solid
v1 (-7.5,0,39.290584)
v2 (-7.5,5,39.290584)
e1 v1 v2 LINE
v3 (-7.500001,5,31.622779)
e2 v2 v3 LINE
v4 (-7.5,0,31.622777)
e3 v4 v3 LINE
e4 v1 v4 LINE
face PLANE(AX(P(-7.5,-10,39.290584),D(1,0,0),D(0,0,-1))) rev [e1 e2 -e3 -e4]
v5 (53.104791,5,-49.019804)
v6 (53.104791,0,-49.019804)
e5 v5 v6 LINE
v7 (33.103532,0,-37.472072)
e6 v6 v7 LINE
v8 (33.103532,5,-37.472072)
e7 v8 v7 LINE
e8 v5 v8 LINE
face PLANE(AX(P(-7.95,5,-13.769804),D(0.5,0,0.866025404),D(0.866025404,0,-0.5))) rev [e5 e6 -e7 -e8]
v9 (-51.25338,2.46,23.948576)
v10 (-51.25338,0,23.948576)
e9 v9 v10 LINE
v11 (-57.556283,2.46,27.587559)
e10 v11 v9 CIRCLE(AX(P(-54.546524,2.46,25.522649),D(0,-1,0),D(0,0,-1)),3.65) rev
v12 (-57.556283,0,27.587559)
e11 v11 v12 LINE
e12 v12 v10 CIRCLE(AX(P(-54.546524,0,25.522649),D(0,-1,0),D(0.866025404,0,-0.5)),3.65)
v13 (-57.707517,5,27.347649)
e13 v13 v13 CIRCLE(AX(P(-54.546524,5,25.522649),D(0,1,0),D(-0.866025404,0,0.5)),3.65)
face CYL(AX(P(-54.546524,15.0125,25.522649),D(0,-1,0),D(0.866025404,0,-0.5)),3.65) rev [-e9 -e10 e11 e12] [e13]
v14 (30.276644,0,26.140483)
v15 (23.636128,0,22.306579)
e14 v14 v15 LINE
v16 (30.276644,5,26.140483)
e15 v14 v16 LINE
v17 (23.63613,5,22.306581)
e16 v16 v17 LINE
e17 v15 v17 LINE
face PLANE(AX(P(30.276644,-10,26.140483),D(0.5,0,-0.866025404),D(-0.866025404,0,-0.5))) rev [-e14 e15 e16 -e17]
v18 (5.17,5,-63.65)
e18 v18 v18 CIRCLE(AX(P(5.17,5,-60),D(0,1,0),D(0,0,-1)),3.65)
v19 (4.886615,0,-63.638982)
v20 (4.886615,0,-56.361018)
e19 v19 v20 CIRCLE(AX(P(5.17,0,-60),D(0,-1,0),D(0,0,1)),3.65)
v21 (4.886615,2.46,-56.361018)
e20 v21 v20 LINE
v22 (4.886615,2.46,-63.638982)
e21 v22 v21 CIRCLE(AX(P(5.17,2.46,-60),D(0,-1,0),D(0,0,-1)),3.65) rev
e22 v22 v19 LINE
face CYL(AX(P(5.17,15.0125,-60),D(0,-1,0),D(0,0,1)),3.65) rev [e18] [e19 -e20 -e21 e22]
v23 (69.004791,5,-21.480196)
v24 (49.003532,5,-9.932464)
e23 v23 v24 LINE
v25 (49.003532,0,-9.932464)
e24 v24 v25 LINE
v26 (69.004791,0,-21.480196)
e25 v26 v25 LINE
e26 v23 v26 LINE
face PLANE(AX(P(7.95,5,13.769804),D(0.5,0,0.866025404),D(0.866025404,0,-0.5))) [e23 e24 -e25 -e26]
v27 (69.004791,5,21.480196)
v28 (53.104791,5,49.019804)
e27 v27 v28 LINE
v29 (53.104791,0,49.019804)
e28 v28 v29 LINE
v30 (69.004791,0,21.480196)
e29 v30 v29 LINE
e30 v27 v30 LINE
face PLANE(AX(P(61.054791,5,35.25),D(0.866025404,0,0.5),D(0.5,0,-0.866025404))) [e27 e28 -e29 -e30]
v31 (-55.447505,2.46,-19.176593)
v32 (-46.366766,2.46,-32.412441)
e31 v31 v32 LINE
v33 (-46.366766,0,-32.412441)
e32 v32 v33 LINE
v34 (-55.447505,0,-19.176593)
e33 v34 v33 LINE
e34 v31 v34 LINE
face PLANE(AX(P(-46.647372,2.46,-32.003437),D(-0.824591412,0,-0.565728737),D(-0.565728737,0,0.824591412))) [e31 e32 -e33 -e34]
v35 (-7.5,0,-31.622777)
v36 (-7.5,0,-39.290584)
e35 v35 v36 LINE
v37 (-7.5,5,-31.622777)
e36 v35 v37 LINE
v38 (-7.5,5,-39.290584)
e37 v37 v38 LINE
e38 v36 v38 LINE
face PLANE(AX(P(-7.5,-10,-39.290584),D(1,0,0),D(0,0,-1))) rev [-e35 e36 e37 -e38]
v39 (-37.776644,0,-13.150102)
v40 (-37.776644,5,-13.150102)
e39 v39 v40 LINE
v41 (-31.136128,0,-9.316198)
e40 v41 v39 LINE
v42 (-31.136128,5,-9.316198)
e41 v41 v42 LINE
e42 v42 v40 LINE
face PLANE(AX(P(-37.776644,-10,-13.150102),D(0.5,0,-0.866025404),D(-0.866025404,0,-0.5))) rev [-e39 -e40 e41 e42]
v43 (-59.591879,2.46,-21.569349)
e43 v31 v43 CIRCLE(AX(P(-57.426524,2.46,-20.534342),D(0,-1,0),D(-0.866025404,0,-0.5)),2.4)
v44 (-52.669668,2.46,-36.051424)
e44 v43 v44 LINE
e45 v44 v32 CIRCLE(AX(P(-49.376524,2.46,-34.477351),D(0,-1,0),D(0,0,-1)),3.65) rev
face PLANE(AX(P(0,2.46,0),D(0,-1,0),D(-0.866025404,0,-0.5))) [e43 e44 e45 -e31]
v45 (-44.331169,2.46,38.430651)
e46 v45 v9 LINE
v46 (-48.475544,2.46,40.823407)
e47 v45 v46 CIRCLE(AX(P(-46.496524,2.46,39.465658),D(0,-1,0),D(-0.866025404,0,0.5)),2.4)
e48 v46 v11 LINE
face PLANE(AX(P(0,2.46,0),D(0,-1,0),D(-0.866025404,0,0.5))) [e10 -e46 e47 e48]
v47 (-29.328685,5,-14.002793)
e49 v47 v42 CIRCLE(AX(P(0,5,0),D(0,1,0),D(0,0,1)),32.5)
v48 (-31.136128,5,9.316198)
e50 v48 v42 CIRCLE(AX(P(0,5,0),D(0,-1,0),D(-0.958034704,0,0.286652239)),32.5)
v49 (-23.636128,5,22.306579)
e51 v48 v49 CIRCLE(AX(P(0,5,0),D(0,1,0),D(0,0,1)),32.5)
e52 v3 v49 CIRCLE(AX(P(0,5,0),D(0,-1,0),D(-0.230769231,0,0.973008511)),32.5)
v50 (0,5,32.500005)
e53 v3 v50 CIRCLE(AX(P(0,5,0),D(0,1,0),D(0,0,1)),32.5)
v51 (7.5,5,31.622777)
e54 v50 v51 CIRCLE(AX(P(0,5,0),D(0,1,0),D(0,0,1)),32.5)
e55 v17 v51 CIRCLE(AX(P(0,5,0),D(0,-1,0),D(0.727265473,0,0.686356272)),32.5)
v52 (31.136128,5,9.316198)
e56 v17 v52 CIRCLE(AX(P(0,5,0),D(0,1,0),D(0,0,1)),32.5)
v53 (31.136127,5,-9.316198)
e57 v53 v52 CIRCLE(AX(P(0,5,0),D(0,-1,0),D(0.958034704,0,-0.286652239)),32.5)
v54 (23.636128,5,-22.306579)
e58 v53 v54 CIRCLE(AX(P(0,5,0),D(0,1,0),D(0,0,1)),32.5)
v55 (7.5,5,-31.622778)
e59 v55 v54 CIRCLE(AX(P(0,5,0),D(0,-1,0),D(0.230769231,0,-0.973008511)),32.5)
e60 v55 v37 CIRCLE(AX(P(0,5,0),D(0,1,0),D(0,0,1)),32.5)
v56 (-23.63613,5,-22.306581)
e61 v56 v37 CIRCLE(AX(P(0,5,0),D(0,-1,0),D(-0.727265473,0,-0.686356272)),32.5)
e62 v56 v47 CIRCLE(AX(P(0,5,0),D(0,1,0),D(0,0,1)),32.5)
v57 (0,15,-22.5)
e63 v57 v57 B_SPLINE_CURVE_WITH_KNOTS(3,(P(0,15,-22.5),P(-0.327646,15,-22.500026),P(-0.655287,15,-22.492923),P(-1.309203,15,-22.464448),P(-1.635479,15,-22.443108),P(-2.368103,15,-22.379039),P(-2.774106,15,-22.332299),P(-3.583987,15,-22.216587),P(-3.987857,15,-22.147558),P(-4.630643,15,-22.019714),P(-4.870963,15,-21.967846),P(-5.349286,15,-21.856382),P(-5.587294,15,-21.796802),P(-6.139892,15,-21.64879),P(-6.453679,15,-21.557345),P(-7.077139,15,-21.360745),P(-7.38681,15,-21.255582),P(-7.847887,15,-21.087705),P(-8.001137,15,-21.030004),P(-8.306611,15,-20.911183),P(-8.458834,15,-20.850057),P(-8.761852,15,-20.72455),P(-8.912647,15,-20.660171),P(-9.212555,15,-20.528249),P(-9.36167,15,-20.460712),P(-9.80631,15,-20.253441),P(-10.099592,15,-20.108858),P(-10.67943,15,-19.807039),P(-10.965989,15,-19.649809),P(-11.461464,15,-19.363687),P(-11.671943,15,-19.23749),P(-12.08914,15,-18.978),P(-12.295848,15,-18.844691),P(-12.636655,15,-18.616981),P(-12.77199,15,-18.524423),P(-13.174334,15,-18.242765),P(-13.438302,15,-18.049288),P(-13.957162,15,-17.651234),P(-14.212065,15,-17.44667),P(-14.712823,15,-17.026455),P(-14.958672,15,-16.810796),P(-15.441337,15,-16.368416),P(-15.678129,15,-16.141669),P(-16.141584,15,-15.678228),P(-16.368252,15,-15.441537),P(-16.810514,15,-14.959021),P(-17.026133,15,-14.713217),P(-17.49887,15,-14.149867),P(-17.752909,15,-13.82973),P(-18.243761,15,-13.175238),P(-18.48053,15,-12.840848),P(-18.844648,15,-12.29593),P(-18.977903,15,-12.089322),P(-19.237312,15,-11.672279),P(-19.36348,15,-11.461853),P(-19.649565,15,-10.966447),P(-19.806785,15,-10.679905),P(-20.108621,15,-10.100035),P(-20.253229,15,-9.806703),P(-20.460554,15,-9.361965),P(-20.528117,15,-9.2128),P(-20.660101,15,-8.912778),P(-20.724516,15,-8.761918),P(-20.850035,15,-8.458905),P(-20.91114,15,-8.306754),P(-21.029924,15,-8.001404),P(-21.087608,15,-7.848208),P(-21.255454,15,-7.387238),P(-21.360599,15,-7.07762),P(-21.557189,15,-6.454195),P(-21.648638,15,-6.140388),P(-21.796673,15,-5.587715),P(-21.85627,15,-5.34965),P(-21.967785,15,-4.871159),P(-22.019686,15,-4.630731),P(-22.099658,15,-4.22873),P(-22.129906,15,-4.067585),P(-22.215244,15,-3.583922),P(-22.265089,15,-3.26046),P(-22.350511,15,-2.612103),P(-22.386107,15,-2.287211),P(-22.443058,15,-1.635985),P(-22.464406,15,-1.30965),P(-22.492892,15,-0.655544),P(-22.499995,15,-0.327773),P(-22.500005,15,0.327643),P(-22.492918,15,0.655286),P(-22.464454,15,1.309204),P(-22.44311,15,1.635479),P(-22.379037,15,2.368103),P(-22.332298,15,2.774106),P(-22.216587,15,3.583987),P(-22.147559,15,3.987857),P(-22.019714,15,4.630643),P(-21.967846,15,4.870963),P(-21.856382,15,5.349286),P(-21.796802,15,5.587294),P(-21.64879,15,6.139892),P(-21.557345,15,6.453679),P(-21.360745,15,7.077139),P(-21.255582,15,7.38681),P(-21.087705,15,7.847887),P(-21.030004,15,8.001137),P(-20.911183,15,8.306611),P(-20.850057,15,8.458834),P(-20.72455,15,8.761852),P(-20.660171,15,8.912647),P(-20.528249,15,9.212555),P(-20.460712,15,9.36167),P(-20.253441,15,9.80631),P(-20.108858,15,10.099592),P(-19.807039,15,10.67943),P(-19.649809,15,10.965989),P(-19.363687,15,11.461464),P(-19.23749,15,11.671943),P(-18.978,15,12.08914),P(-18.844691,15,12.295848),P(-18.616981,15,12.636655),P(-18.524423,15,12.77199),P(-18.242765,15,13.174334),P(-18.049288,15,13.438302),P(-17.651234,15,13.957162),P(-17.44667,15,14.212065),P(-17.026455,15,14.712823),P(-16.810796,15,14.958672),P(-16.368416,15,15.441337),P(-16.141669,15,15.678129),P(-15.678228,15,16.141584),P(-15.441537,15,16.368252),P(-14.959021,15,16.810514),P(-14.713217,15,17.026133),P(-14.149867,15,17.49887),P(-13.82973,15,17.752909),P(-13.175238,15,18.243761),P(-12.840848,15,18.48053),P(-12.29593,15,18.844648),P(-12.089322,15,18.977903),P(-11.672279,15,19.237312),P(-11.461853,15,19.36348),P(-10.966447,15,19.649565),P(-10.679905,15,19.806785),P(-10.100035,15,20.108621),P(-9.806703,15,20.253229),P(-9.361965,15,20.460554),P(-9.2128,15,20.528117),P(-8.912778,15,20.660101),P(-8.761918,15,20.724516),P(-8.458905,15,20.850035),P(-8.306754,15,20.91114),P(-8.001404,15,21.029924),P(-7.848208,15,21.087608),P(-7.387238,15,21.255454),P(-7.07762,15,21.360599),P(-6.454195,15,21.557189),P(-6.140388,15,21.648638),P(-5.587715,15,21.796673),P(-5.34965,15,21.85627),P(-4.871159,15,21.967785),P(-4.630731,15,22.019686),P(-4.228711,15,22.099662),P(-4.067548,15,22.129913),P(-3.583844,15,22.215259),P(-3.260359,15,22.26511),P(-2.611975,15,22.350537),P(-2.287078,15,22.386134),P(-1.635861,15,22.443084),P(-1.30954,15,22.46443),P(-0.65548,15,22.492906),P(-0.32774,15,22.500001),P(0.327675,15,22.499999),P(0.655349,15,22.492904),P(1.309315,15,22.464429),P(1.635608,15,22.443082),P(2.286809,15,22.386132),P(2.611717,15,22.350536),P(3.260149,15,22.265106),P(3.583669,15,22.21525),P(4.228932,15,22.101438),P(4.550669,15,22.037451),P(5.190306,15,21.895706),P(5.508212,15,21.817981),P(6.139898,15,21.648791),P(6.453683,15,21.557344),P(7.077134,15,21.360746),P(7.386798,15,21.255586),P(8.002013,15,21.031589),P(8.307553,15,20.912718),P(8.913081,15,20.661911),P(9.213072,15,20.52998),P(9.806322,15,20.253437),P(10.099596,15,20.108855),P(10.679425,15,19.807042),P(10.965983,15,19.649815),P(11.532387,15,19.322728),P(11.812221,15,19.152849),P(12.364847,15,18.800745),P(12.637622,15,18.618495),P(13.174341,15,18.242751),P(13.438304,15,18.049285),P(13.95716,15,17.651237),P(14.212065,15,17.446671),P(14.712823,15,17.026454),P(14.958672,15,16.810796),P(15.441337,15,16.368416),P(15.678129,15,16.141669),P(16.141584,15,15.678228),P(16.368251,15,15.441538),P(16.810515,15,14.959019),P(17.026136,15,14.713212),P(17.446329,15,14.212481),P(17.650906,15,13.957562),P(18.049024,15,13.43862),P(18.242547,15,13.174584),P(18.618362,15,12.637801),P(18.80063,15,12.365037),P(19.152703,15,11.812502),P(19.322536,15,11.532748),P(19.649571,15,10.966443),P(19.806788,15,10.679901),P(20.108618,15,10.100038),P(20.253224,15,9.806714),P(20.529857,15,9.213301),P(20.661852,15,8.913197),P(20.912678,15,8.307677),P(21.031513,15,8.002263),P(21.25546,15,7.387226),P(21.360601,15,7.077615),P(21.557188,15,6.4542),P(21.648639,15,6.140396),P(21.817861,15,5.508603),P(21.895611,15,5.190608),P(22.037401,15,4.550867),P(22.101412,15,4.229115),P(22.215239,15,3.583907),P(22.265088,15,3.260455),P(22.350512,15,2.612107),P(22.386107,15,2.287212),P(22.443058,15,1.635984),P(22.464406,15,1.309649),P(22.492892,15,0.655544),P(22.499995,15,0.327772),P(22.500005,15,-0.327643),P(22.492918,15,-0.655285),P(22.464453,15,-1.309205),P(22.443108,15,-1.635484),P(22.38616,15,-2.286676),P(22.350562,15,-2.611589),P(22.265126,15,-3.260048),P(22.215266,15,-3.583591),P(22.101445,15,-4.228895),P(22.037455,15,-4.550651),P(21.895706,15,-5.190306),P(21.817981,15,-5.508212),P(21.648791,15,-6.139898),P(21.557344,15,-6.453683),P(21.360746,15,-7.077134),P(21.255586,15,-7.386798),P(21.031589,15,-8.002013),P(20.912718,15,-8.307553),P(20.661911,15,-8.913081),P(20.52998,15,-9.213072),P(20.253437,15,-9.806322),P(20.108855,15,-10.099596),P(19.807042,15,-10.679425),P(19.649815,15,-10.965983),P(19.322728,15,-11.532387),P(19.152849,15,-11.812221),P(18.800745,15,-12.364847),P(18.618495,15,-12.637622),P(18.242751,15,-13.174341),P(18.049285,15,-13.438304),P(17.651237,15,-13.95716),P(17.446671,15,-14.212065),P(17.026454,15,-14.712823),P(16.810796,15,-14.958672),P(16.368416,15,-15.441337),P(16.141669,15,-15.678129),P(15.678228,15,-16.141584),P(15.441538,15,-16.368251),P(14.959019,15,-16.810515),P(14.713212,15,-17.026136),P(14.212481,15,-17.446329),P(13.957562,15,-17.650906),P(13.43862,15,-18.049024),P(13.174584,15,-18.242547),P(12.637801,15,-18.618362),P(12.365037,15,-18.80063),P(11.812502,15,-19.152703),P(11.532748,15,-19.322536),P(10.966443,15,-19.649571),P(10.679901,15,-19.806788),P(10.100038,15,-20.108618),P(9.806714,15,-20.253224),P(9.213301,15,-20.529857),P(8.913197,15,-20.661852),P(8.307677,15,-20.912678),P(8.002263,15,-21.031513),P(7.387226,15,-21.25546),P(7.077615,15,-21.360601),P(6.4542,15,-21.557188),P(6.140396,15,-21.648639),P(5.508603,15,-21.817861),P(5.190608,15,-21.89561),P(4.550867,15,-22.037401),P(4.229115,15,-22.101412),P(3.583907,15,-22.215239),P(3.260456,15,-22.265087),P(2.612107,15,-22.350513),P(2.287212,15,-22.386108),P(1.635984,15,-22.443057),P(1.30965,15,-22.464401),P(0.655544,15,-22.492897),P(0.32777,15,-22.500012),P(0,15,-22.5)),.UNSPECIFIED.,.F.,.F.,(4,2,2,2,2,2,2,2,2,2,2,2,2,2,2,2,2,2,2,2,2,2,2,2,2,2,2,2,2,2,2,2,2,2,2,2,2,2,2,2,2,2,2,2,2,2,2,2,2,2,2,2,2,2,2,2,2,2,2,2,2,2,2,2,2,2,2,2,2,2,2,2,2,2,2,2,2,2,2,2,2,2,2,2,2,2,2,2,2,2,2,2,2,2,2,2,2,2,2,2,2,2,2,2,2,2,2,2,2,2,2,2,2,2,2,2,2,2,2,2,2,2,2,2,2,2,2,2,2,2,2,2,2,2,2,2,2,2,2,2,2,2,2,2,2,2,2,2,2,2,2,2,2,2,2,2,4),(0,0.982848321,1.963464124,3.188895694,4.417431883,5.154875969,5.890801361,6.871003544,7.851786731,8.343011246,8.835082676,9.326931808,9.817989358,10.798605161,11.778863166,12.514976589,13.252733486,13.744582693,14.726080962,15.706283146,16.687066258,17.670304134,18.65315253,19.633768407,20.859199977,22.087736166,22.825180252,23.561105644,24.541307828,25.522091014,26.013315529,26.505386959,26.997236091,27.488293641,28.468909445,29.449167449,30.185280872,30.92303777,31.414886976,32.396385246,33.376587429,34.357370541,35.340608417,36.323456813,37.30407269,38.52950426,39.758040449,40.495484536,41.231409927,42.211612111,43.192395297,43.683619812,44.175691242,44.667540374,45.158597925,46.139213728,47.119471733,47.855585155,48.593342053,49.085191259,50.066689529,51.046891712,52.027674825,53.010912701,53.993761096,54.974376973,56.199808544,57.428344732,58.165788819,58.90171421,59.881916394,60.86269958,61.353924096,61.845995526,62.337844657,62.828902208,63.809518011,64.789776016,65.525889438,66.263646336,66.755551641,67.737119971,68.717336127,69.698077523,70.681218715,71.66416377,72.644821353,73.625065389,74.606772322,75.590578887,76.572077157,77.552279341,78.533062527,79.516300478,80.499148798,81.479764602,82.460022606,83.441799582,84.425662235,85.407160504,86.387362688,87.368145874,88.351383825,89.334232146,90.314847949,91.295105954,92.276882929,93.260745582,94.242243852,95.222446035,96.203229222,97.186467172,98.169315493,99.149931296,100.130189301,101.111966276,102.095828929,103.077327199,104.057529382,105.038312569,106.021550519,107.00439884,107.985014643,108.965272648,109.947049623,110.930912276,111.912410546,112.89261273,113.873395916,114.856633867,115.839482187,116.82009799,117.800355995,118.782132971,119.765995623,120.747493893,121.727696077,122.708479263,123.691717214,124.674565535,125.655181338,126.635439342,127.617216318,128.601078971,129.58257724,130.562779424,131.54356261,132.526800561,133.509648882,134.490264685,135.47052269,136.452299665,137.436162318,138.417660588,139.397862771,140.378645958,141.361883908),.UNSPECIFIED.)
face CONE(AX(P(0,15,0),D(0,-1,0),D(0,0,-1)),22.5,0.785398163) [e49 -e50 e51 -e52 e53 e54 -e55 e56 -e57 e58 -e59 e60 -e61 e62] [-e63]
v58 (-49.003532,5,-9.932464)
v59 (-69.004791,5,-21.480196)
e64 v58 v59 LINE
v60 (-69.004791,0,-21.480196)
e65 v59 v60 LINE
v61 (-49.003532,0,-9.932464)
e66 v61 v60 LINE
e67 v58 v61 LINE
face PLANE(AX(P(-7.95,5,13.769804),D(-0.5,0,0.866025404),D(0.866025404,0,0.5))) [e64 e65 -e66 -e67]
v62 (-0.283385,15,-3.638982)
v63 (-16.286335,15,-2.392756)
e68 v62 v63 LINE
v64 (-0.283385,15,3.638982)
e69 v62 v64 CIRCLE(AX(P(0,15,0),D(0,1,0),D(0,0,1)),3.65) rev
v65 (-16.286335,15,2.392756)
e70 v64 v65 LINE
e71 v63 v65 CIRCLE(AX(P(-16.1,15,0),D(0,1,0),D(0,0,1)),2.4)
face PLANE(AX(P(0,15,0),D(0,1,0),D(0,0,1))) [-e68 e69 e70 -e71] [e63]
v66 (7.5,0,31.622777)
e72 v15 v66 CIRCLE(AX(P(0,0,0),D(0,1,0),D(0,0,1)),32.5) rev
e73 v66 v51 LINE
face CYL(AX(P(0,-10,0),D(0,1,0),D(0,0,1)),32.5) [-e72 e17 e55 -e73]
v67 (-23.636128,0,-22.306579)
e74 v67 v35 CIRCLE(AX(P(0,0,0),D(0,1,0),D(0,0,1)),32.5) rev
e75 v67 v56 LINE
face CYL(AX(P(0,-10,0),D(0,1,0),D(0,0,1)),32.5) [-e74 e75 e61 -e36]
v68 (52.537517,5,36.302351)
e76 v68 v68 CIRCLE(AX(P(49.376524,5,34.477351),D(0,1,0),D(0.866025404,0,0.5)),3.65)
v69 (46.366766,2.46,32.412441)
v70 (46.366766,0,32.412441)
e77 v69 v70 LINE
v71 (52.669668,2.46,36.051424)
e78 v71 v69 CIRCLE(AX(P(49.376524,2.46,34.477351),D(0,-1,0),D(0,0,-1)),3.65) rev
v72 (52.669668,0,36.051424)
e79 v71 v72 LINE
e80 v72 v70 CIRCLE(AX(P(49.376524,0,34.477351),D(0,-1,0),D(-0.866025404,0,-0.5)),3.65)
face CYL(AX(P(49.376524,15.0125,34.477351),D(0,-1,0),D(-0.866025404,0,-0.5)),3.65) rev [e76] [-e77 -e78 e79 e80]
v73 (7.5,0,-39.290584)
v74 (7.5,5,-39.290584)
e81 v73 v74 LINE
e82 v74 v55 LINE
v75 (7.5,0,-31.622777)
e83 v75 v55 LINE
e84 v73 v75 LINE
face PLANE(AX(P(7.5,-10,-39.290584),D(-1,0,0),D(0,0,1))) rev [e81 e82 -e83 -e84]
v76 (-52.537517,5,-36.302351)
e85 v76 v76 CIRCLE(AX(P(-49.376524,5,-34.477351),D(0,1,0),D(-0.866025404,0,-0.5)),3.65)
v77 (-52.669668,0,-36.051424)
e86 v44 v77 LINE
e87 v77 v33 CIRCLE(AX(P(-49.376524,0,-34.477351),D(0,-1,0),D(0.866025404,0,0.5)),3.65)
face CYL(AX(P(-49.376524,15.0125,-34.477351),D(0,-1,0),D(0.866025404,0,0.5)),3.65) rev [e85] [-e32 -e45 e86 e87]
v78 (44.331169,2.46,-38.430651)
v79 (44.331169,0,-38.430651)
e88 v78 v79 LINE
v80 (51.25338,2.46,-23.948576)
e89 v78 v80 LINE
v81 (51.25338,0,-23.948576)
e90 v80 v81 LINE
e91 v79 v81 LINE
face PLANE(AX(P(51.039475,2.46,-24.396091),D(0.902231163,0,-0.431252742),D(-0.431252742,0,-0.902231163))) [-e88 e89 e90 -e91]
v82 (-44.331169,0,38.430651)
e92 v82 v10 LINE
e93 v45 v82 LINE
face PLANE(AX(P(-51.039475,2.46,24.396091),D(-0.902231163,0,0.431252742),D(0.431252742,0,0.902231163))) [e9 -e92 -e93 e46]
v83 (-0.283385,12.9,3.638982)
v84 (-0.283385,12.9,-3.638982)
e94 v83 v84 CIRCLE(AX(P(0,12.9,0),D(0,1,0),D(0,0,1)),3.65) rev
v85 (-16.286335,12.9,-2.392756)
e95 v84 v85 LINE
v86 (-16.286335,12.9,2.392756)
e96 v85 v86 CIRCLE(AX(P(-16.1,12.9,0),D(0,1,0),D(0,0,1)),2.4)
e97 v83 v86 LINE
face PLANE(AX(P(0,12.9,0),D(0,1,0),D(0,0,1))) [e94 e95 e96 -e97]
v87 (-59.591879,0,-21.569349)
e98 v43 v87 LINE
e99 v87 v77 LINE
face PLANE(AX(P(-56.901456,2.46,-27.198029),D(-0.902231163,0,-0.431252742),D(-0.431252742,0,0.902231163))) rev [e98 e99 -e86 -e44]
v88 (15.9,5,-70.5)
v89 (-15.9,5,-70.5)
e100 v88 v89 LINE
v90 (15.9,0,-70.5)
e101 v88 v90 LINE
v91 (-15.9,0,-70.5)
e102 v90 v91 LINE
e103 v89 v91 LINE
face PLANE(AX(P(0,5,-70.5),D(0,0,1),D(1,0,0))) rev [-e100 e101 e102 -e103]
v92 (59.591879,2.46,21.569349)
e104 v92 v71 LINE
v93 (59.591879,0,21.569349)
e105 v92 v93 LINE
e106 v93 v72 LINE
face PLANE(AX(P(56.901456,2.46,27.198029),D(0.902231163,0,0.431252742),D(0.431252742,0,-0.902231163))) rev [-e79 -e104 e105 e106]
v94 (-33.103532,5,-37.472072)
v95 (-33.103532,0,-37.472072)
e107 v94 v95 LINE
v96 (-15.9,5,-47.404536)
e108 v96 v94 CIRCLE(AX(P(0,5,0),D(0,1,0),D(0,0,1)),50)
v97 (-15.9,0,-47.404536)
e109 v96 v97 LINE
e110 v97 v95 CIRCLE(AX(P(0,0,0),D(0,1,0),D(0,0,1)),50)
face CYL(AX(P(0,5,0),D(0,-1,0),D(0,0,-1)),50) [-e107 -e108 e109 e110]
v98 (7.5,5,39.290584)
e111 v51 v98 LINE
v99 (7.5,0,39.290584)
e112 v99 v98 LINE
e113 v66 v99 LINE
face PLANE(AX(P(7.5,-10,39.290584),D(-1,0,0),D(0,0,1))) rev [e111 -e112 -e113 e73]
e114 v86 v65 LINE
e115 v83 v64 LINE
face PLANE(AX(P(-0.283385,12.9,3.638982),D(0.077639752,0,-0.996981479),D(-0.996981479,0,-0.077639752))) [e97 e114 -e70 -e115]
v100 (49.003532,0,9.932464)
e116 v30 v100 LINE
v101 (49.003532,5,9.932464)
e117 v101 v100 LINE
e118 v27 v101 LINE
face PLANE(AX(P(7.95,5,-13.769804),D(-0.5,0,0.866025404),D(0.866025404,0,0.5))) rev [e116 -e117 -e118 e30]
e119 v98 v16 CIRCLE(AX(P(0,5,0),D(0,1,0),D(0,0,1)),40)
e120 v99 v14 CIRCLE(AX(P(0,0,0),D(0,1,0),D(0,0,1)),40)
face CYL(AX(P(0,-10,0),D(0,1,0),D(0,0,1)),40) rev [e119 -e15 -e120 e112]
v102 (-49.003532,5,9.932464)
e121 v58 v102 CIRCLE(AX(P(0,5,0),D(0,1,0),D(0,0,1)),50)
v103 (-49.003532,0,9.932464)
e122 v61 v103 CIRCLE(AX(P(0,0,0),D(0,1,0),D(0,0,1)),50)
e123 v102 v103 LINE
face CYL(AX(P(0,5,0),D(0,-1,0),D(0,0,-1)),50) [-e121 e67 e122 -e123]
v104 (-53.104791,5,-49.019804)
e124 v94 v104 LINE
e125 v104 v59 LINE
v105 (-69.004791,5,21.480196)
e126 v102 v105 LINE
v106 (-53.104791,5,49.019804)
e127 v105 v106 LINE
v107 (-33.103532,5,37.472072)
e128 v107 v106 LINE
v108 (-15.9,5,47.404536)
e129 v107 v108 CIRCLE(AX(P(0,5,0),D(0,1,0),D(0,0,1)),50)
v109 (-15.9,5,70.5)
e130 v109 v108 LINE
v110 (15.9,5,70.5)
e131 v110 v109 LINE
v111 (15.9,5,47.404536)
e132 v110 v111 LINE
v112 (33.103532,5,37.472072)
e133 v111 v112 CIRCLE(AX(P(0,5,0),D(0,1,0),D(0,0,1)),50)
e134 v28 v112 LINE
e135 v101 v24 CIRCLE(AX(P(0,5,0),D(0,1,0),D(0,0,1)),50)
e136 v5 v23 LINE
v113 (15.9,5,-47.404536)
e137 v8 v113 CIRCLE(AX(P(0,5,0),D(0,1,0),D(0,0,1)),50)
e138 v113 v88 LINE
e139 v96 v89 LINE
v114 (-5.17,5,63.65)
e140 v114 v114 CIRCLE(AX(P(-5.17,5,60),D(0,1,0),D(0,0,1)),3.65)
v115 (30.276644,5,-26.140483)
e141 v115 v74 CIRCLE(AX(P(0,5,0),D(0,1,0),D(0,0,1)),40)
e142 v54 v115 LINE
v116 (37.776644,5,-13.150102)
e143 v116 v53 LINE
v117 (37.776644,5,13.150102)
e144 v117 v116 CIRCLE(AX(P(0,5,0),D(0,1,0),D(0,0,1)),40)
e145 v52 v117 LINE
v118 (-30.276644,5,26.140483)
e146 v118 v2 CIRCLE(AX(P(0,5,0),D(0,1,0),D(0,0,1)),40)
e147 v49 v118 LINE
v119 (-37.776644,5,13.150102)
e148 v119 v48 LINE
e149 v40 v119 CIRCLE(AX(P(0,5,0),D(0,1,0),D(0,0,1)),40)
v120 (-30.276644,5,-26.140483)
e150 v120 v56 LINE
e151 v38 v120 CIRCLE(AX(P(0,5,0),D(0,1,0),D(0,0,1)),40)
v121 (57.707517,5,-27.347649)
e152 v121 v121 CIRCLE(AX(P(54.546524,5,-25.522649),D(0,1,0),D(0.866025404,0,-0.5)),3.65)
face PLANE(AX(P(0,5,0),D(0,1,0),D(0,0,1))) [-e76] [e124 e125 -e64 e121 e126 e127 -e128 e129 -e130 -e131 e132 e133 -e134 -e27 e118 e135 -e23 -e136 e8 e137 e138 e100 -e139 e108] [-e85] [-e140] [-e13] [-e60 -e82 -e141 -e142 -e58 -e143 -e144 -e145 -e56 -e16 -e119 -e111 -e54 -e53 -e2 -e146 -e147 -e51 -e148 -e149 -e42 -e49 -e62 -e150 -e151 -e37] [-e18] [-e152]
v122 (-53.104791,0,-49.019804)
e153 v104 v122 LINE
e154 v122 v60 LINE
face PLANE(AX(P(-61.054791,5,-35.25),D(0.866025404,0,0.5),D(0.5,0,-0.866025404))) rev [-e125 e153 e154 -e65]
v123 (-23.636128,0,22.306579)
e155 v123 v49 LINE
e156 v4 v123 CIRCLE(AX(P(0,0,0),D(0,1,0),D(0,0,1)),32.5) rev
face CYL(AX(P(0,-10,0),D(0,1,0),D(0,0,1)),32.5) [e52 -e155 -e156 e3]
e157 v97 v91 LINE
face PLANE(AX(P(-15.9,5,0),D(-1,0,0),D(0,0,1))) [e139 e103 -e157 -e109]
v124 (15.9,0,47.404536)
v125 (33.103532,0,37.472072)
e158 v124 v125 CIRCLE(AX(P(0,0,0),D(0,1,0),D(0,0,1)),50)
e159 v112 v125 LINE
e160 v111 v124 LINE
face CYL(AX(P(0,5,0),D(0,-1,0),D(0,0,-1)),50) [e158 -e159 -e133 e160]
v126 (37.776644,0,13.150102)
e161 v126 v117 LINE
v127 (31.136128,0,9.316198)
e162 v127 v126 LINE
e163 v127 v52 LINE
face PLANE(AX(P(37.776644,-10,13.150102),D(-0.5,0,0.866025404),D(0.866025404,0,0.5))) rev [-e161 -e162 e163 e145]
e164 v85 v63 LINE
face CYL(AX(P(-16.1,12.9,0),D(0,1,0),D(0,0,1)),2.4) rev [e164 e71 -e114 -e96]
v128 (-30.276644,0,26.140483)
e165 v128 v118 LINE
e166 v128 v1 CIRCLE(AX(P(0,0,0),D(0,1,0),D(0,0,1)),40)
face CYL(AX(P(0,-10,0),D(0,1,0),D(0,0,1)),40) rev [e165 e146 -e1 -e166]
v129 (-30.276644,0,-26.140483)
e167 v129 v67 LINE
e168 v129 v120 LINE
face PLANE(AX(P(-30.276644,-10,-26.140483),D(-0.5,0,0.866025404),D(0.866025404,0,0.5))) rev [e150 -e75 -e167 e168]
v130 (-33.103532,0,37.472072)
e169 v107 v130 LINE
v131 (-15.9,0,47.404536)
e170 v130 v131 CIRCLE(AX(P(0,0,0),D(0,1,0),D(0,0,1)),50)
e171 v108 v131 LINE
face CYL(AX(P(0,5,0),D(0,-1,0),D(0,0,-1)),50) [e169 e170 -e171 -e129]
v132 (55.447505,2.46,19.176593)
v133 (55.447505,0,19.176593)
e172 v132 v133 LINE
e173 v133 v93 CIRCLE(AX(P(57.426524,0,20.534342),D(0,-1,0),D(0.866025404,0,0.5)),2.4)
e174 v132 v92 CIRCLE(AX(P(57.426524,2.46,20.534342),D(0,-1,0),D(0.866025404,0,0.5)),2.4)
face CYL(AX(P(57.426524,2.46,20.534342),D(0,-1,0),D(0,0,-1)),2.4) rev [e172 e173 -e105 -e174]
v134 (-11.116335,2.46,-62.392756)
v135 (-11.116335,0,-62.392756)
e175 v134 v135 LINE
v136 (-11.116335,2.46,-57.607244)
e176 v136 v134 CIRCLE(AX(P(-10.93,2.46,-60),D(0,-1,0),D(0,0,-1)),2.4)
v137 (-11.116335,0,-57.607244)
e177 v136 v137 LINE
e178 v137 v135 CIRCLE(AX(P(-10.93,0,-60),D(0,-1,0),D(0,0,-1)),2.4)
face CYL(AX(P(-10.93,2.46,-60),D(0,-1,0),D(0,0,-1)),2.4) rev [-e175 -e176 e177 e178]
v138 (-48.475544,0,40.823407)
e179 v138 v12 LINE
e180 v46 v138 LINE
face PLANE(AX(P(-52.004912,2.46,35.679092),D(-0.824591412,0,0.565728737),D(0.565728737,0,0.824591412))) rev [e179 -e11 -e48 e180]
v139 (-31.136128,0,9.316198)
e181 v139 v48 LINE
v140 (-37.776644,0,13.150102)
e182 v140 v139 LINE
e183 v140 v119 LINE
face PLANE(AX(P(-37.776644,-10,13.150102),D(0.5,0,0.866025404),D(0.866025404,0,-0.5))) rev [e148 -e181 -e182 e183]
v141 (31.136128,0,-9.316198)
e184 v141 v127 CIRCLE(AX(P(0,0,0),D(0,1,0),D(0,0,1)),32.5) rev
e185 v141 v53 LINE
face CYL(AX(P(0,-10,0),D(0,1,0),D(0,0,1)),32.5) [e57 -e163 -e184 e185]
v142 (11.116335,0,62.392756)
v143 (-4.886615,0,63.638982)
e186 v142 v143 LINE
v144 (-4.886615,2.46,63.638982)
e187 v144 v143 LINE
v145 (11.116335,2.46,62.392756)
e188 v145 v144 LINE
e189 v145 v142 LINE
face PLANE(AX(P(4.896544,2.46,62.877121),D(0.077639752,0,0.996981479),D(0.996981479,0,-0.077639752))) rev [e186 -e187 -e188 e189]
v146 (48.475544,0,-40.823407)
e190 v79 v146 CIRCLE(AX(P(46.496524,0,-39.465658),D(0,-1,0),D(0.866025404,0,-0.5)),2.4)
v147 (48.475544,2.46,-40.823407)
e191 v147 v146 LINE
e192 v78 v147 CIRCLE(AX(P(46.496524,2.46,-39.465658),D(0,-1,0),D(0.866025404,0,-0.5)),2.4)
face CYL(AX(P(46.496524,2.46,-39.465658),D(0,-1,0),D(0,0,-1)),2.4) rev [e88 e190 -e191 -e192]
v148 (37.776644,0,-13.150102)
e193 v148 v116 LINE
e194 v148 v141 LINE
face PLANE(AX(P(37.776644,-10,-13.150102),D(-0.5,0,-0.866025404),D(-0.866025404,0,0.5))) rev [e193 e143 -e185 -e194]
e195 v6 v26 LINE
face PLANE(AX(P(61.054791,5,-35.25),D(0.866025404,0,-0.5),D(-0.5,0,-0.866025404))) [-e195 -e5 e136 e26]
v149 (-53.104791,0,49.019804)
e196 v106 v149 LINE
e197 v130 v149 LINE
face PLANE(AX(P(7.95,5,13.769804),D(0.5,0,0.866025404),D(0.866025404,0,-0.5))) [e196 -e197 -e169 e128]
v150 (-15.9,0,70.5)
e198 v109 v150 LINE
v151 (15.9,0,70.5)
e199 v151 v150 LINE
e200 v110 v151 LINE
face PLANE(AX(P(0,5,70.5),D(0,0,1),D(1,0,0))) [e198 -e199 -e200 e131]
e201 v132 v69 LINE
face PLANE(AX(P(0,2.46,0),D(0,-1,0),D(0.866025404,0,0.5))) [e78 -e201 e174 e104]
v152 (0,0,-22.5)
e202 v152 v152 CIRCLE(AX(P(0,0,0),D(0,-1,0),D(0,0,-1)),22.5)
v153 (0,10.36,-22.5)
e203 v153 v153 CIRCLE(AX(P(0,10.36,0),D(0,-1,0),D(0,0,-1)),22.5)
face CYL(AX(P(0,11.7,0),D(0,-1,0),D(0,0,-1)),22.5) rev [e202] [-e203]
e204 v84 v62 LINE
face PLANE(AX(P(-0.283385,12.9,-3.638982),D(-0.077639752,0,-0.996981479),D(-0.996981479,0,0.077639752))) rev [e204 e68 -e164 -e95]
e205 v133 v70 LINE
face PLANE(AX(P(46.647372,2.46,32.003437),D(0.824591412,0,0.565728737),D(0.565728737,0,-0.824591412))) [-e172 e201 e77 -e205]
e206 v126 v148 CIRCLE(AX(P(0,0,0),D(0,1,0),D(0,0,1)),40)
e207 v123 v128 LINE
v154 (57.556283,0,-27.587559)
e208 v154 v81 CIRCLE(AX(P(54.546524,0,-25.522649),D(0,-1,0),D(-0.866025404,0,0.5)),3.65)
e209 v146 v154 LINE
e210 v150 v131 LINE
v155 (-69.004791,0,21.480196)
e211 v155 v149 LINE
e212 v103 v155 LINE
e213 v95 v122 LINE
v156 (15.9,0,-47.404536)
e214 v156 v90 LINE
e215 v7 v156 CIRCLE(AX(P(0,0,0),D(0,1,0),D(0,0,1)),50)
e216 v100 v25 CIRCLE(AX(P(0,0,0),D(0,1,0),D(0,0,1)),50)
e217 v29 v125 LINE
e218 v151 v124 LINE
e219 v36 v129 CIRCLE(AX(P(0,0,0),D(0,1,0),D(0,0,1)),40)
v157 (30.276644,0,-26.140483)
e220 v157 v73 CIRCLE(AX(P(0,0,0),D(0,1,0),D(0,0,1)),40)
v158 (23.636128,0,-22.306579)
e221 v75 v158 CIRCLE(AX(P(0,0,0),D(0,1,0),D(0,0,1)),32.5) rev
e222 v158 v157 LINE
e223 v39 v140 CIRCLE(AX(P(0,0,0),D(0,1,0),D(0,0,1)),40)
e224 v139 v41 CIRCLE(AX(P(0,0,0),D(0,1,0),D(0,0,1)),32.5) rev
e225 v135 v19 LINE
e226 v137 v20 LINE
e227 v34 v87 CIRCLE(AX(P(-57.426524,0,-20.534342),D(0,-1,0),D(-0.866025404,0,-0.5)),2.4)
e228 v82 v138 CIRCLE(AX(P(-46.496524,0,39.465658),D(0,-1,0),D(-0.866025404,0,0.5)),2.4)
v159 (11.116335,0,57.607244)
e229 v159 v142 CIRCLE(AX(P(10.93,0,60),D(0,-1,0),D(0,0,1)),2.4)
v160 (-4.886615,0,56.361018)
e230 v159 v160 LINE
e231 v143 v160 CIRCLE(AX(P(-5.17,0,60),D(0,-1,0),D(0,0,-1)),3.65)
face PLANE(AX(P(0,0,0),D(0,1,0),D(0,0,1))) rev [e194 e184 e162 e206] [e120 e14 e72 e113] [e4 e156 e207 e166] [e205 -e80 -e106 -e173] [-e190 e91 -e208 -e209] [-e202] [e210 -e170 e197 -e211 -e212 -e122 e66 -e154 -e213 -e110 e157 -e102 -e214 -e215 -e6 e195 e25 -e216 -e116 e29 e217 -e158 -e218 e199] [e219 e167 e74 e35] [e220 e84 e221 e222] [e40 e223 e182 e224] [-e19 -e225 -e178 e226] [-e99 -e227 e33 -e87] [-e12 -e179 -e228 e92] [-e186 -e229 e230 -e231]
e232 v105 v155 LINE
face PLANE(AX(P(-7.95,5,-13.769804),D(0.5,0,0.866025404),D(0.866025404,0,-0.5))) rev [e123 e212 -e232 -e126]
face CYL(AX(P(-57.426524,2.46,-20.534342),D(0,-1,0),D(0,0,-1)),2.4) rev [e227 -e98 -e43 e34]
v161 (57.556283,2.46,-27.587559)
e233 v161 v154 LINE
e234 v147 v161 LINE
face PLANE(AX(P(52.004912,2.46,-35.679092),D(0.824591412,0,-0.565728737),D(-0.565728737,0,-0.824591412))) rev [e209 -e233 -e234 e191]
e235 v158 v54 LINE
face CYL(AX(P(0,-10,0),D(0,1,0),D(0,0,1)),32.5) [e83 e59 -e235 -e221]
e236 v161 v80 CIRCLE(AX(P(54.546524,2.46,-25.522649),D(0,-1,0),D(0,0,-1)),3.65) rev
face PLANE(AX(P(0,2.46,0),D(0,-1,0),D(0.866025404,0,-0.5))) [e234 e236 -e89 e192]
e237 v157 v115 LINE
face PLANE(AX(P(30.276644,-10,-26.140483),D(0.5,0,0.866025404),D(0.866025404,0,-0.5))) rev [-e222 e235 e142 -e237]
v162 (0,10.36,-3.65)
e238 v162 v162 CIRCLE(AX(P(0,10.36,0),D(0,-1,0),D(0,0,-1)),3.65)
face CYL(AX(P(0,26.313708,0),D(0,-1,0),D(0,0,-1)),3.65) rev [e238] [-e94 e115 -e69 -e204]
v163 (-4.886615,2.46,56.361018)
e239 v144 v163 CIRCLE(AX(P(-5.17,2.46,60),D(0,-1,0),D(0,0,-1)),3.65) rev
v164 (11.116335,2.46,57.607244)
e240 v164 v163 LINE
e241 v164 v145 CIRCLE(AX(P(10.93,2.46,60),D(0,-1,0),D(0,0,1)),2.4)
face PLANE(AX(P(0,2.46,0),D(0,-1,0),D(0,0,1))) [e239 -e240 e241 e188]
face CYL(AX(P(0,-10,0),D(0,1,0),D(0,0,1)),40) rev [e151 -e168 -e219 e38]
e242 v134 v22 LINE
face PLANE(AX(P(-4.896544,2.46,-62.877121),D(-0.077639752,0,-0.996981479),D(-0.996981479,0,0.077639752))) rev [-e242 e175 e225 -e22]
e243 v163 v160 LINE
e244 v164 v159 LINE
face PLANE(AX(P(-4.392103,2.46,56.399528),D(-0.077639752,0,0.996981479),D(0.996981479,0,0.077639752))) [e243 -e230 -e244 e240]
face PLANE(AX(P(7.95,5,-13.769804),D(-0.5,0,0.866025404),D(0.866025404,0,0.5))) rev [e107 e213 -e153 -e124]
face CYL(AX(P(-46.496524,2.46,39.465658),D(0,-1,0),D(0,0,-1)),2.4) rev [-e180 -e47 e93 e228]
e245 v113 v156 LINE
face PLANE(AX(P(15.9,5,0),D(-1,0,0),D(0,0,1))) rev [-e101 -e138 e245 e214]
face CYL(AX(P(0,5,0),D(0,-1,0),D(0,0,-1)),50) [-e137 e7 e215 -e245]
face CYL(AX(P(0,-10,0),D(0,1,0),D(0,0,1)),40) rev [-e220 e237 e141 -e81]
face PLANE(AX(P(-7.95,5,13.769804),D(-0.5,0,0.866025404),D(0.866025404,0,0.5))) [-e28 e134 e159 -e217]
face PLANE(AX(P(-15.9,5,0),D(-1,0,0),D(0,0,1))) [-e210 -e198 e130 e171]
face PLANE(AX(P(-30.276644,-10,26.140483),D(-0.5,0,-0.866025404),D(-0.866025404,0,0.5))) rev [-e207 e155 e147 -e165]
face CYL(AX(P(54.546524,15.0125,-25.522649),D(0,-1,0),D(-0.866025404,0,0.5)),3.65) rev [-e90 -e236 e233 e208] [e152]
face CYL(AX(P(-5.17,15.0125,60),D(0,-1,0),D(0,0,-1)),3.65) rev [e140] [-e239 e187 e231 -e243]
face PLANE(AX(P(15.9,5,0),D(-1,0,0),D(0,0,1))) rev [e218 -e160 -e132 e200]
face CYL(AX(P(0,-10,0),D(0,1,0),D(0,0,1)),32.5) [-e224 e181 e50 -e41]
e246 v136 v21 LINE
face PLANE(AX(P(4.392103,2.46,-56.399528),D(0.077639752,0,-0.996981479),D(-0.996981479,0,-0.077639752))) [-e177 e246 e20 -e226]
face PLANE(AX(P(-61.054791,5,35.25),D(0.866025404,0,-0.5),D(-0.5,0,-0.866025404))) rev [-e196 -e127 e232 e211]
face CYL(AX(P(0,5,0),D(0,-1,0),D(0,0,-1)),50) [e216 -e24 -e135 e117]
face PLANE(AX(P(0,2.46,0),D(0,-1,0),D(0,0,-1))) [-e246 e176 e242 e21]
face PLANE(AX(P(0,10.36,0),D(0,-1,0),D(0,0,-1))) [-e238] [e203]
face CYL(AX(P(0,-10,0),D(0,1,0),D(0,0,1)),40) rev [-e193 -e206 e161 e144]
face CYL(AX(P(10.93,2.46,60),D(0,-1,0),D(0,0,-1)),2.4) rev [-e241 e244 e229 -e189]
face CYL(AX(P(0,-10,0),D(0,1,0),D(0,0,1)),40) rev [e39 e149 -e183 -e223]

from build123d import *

# Parameters (mm, degrees)
BOSS_EXTRUDE1_DEPTH = 5
CIRPATTERN1_COUNT   = 3
CIRPATTERN1_ANGLE   = 120
SKETCH8_R           = 22.5
BOSS_EXTRUDE4_DEPTH = 10
SKETCH11_R          = 22.5
CUT_EXTRUDE4_DEPTH  = 11.7
SKETCH12_R          = 4
CUT_EXTRUDE5_DEPTH  = 3.3
SKETCH14_R          = 3.65
CUT_EXTRUDE7_DEPTH  = 100.784323589
CIRPATTERN2_COUNT   = 6
CUT_EXTRUDE9_DEPTH  = 15
SKETCH16_R          = 2.4
SKETCH16_R_2        = 3.65
CUT_EXTRUDE10_DEPTH = 2.46
CIRPATTERN3_COUNT   = 6
SKETCH17_R          = 4
SKETCH17_R_2        = 3.65
BOSS_EXTRUDE5_DEPTH = 3.3
CUT_EXTRUDE11_START = -2.1
SKETCH18_R          = 2.4
SKETCH18_R_2        = 3.65
CUT_EXTRUDE11_DEPTH = 2.1
BOSS_EXTRUDE6_START = 1.34
SKETCH21_R          = 22.5
BOSS_EXTRUDE6_DEPTH = 1.34
CUT_EXTRUDE12_START = -10.34
SKETCH22_R          = 3.65
CUT_EXTRUDE12_DEPTH = 10.34


# Read off the part's stored shape, not the designer's step: Boundary2
with BuildPart() as part:
    # Sketch1 → Boss-Extrude1 (new body)
    with BuildSketch(Plane(origin=(0, 0, 0), x_dir=(1, 0, 0), z_dir=(0, 1, 0))):
        with BuildLine():
            ThreePointArc((-15.9, 47.404535648), (-50, 0), (-15.9, -47.404535648))
            Line((-15.9, -47.404535648), (-15.9, 47.404535648))
        make_face()
        with BuildLine():
            ThreePointArc((-15.9, -47.404535648), (0, -50), (15.9, -47.404535648))
            Line((15.9, -47.404535648), (15.9, 47.404535648))
            ThreePointArc((15.9, 47.404535648), (0, 50), (-15.9, 47.404535648))
            Line((-15.9, 47.404535648), (-15.9, -47.404535648))
        make_face()
        with BuildLine():
            Line((-15.9, -70.5), (15.9, -70.5))
            Line((15.9, -70.5), (15.9, -47.404535648))
            ThreePointArc((15.9, -47.404535648), (0, -50), (-15.9, -47.404535648))
            Line((-15.9, -47.404535648), (-15.9, -70.5))
        make_face()
        with BuildLine():
            ThreePointArc((-15.9, 47.404535648), (0, 50), (15.9, 47.404535648))
            Line((15.9, 47.404535648), (15.9, 70.5))
            Line((15.9, 70.5), (-15.9, 70.5))
            Line((-15.9, 70.5), (-15.9, 47.404535648))
        make_face()
        with BuildLine():
            Line((15.9, 47.404535648), (15.9, -47.404535648))
            ThreePointArc((15.9, -47.404535648), (40.589407485, -29.197602641), (50, 0))
            ThreePointArc((50, 0), (40.589407485, 29.197602641), (15.9, 47.404535648))
        make_face()
    boss_extrude1 = extrude(amount=BOSS_EXTRUDE1_DEPTH)

    # CirPattern1: Boss-Extrude1 ×3 about axis
    cirpattern1_axis = Axis((0, 0, 0), (0, 1, 0))
    for i in range(1, CIRPATTERN1_COUNT):
        add(boss_extrude1.rotate(cirpattern1_axis, i * CIRPATTERN1_ANGLE / (CIRPATTERN1_COUNT - 1)))

    # Sketch8 → Boss-Extrude4 (add)
    with BuildSketch(Plane(origin=(0, 5, 0), x_dir=(1, 0, 0), z_dir=(0, 1, 0))):
        with Locations(Location((0, 0, 0), (0, 0, 270))):
            Circle(SKETCH8_R)
    extrude(amount=BOSS_EXTRUDE4_DEPTH)

    # Boundary2 outline → Boundary2 (revolve)
    with BuildSketch(Plane.XY):
        Polygon((32.5, 5), (22.499998072, 15.000001928), (22.5, 5), align=None)
    revolve(axis=Axis((0, 0, 0), (0, 1, 0)))

    # Sketch11 → Cut-Extrude4 (cut)
    with BuildSketch(Plane.XZ):
        with Locations(Location((0, 0, 0), (0, 0, 270))):
            Circle(SKETCH11_R)
    extrude(amount=-CUT_EXTRUDE4_DEPTH, mode=Mode.SUBTRACT)

    # Sketch12 → Cut-Extrude5 (cut)
    with BuildSketch(Plane.XZ.offset(-11.7)):
        with Locations(Location((0, 0, 0), (0, 0, 270))):
            Circle(SKETCH12_R)
    extrude(amount=-CUT_EXTRUDE5_DEPTH, mode=Mode.SUBTRACT)

    # Sketch14 → Cut-Extrude7 (cut, through all)
    with BuildSketch(Plane(origin=(0, 0, 0), x_dir=(-1, 0, 0), z_dir=(0, -1, 0))):
        with Locations(Location((5.17, -60, 0), (0, 0, 90))):
            Circle(SKETCH14_R)
    cut_extrude7 = extrude(amount=-CUT_EXTRUDE7_DEPTH, mode=Mode.SUBTRACT)

    # CirPattern2: Cut-Extrude7 ×6 about axis
    cirpattern2_axis = Axis((0, 0, 0), (0, 1, 0))
    for i in range(1, CIRPATTERN2_COUNT):
        add(cut_extrude7.rotate(cirpattern2_axis, i * 360 / CIRPATTERN2_COUNT), mode=Mode.SUBTRACT)

    # Sketch15 → Cut-Extrude9 (cut)
    with BuildSketch(Plane(origin=(0, 5, 0), x_dir=(1, 0, 0), z_dir=(0, 1, 0))):
        with BuildLine():
            Line((-37.776643972, 13.150101528), (-31.136127875, 9.316197772))
            ThreePointArc((-31.136127875, 9.316197772), (-32.5, 0), (-31.136127875, -9.316197772))
            Line((-31.136127875, -9.316197772), (-37.776643972, -13.150101528))
            ThreePointArc((-37.776643972, -13.150101528), (-40, 0), (-37.776643972, 13.150101528))
        make_face()
        with BuildLine():
            Line((-30.276643972, 26.140482585), (-23.636127875, 22.306578829))
            ThreePointArc((-23.636127875, 22.306578829), (-16.25, 28.145825623), (-7.5, 31.622776602))
            Line((-7.5, 31.622776602), (-7.5, 39.290584114))
            ThreePointArc((-7.5, 39.290584114), (-20, 34.641016151), (-30.276643972, 26.140482585))
        make_face()
        with BuildLine():
            Line((7.5, 39.290584114), (7.5, 31.622776602))
            ThreePointArc((7.5, 31.622776602), (16.25, 28.145825623), (23.636127875, 22.306578829))
            Line((23.636127875, 22.306578829), (30.276643972, 26.140482585))
            ThreePointArc((30.276643972, 26.140482585), (20, 34.641016151), (7.5, 39.290584114))
        make_face()
        with BuildLine():
            Line((37.776643972, 13.150101528), (31.136127875, 9.316197772))
            ThreePointArc((31.136127875, 9.316197772), (32.5, 0), (31.136127875, -9.316197772))
            Line((31.136127875, -9.316197772), (37.776643972, -13.150101528))
            ThreePointArc((37.776643972, -13.150101528), (40, 0), (37.776643972, 13.150101528))
        make_face()
        with BuildLine():
            Line((30.276643972, -26.140482585), (23.636127875, -22.306578829))
            ThreePointArc((23.636127875, -22.306578829), (16.25, -28.145825623), (7.5, -31.622776602))
            Line((7.5, -31.622776602), (7.5, -39.290584114))
            ThreePointArc((7.5, -39.290584114), (20, -34.641016151), (30.276643972, -26.140482585))
        make_face()
        with BuildLine():
            Line((-7.5, -39.290584114), (-7.5, -31.622776602))
            ThreePointArc((-7.5, -31.622776602), (-16.25, -28.145825623), (-23.636127875, -22.306578829))
            Line((-23.636127875, -22.306578829), (-30.276643972, -26.140482585))
            ThreePointArc((-30.276643972, -26.140482585), (-20, -34.641016151), (-7.5, -39.290584114))
        make_face()
    extrude(amount=-CUT_EXTRUDE9_DEPTH, mode=Mode.SUBTRACT)

    # Sketch16 → Cut-Extrude10 (cut)
    with BuildSketch(Plane.XZ):
        with Locations((-10.93, -60)):
            Circle(SKETCH16_R)
        with BuildLine():
            Line((4.886614907, -56.361017603), (-11.116335404, -57.607244451))
            ThreePointArc((-11.116335404, -57.607244451), (-9.300154144, -58.238295574), (-8.53, -60))
            ThreePointArc((-8.53, -60), (-9.300154144, -61.761704426), (-11.116335404, -62.392755549))
            Line((-11.116335404, -62.392755549), (4.886614907, -63.638982397))
            ThreePointArc((4.886614907, -63.638982397), (1.52, -60), (4.886614907, -56.361017603))
        make_face()
        with Locations(Location((5.17, -60, 0), (0, 0, 94.452911391))):
            Circle(SKETCH16_R_2)
    cut_extrude10 = extrude(amount=-CUT_EXTRUDE10_DEPTH, mode=Mode.SUBTRACT)

    # CirPattern3: Cut-Extrude10 ×6 about axis
    cirpattern3_axis = Axis((0, 0, 0), (0, 1, 0))
    for i in range(1, CIRPATTERN3_COUNT):
        add(cut_extrude10.rotate(cirpattern3_axis, i * 360 / CIRPATTERN3_COUNT), mode=Mode.SUBTRACT)

    # Sketch17 → Boss-Extrude5 (add)
    with BuildSketch(Plane.XZ.offset(-11.7)):
        Circle(SKETCH17_R)
        with Locations(Location((0, 0, 0), (0, 0, 270))):
            Circle(SKETCH17_R_2, mode=Mode.SUBTRACT)
    extrude(amount=-BOSS_EXTRUDE5_DEPTH)

    # Sketch18 → Cut-Extrude11 (cut)
    with BuildSketch(Plane(origin=(0, 15, 0), x_dir=(1, 0, 0), z_dir=(0, 1, 0)).offset(CUT_EXTRUDE11_START)):
        with BuildLine():
            Line((-16.286335404, -2.392755549), (-0.283385093, -3.638982397))
            ThreePointArc((-0.283385093, -3.638982397), (-3.65, 0), (-0.283385093, 3.638982397))
            Line((-0.283385093, 3.638982397), (-16.286335404, 2.392755549))
            ThreePointArc((-16.286335404, 2.392755549), (-14.470154144, 1.761704426), (-13.7, 0))
            ThreePointArc((-13.7, 0), (-14.470154144, -1.761704426), (-16.286335404, -2.392755549))
        make_face()
        with Locations((-16.1, 0)):
            Circle(SKETCH18_R)
        with Locations(Location((0, 0, 0), (0, 0, 90))):
            Circle(SKETCH18_R_2)
    extrude(amount=CUT_EXTRUDE11_DEPTH, mode=Mode.SUBTRACT)

    # Sketch21 → Boss-Extrude6 (add)
    with BuildSketch(Plane(origin=(0, 11.7, 0), x_dir=(-1, 0, 0), z_dir=(0, -1, 0)).offset(BOSS_EXTRUDE6_START)):
        with Locations(Location((0, 0, 0), (0, 0, 90))):
            Circle(SKETCH21_R)
    extrude(amount=-BOSS_EXTRUDE6_DEPTH)

    # Sketch22 → Cut-Extrude12 (cut)
    with BuildSketch(Plane(origin=(0, 15, 0), x_dir=(1, 0, 0), z_dir=(0, 1, 0)).offset(CUT_EXTRUDE12_START)):
        with Locations(Location((0, 0, 0), (0, 0, 90))):
            Circle(SKETCH22_R)
    extrude(amount=CUT_EXTRUDE12_DEPTH, mode=Mode.SUBTRACT)


solid = part.part
